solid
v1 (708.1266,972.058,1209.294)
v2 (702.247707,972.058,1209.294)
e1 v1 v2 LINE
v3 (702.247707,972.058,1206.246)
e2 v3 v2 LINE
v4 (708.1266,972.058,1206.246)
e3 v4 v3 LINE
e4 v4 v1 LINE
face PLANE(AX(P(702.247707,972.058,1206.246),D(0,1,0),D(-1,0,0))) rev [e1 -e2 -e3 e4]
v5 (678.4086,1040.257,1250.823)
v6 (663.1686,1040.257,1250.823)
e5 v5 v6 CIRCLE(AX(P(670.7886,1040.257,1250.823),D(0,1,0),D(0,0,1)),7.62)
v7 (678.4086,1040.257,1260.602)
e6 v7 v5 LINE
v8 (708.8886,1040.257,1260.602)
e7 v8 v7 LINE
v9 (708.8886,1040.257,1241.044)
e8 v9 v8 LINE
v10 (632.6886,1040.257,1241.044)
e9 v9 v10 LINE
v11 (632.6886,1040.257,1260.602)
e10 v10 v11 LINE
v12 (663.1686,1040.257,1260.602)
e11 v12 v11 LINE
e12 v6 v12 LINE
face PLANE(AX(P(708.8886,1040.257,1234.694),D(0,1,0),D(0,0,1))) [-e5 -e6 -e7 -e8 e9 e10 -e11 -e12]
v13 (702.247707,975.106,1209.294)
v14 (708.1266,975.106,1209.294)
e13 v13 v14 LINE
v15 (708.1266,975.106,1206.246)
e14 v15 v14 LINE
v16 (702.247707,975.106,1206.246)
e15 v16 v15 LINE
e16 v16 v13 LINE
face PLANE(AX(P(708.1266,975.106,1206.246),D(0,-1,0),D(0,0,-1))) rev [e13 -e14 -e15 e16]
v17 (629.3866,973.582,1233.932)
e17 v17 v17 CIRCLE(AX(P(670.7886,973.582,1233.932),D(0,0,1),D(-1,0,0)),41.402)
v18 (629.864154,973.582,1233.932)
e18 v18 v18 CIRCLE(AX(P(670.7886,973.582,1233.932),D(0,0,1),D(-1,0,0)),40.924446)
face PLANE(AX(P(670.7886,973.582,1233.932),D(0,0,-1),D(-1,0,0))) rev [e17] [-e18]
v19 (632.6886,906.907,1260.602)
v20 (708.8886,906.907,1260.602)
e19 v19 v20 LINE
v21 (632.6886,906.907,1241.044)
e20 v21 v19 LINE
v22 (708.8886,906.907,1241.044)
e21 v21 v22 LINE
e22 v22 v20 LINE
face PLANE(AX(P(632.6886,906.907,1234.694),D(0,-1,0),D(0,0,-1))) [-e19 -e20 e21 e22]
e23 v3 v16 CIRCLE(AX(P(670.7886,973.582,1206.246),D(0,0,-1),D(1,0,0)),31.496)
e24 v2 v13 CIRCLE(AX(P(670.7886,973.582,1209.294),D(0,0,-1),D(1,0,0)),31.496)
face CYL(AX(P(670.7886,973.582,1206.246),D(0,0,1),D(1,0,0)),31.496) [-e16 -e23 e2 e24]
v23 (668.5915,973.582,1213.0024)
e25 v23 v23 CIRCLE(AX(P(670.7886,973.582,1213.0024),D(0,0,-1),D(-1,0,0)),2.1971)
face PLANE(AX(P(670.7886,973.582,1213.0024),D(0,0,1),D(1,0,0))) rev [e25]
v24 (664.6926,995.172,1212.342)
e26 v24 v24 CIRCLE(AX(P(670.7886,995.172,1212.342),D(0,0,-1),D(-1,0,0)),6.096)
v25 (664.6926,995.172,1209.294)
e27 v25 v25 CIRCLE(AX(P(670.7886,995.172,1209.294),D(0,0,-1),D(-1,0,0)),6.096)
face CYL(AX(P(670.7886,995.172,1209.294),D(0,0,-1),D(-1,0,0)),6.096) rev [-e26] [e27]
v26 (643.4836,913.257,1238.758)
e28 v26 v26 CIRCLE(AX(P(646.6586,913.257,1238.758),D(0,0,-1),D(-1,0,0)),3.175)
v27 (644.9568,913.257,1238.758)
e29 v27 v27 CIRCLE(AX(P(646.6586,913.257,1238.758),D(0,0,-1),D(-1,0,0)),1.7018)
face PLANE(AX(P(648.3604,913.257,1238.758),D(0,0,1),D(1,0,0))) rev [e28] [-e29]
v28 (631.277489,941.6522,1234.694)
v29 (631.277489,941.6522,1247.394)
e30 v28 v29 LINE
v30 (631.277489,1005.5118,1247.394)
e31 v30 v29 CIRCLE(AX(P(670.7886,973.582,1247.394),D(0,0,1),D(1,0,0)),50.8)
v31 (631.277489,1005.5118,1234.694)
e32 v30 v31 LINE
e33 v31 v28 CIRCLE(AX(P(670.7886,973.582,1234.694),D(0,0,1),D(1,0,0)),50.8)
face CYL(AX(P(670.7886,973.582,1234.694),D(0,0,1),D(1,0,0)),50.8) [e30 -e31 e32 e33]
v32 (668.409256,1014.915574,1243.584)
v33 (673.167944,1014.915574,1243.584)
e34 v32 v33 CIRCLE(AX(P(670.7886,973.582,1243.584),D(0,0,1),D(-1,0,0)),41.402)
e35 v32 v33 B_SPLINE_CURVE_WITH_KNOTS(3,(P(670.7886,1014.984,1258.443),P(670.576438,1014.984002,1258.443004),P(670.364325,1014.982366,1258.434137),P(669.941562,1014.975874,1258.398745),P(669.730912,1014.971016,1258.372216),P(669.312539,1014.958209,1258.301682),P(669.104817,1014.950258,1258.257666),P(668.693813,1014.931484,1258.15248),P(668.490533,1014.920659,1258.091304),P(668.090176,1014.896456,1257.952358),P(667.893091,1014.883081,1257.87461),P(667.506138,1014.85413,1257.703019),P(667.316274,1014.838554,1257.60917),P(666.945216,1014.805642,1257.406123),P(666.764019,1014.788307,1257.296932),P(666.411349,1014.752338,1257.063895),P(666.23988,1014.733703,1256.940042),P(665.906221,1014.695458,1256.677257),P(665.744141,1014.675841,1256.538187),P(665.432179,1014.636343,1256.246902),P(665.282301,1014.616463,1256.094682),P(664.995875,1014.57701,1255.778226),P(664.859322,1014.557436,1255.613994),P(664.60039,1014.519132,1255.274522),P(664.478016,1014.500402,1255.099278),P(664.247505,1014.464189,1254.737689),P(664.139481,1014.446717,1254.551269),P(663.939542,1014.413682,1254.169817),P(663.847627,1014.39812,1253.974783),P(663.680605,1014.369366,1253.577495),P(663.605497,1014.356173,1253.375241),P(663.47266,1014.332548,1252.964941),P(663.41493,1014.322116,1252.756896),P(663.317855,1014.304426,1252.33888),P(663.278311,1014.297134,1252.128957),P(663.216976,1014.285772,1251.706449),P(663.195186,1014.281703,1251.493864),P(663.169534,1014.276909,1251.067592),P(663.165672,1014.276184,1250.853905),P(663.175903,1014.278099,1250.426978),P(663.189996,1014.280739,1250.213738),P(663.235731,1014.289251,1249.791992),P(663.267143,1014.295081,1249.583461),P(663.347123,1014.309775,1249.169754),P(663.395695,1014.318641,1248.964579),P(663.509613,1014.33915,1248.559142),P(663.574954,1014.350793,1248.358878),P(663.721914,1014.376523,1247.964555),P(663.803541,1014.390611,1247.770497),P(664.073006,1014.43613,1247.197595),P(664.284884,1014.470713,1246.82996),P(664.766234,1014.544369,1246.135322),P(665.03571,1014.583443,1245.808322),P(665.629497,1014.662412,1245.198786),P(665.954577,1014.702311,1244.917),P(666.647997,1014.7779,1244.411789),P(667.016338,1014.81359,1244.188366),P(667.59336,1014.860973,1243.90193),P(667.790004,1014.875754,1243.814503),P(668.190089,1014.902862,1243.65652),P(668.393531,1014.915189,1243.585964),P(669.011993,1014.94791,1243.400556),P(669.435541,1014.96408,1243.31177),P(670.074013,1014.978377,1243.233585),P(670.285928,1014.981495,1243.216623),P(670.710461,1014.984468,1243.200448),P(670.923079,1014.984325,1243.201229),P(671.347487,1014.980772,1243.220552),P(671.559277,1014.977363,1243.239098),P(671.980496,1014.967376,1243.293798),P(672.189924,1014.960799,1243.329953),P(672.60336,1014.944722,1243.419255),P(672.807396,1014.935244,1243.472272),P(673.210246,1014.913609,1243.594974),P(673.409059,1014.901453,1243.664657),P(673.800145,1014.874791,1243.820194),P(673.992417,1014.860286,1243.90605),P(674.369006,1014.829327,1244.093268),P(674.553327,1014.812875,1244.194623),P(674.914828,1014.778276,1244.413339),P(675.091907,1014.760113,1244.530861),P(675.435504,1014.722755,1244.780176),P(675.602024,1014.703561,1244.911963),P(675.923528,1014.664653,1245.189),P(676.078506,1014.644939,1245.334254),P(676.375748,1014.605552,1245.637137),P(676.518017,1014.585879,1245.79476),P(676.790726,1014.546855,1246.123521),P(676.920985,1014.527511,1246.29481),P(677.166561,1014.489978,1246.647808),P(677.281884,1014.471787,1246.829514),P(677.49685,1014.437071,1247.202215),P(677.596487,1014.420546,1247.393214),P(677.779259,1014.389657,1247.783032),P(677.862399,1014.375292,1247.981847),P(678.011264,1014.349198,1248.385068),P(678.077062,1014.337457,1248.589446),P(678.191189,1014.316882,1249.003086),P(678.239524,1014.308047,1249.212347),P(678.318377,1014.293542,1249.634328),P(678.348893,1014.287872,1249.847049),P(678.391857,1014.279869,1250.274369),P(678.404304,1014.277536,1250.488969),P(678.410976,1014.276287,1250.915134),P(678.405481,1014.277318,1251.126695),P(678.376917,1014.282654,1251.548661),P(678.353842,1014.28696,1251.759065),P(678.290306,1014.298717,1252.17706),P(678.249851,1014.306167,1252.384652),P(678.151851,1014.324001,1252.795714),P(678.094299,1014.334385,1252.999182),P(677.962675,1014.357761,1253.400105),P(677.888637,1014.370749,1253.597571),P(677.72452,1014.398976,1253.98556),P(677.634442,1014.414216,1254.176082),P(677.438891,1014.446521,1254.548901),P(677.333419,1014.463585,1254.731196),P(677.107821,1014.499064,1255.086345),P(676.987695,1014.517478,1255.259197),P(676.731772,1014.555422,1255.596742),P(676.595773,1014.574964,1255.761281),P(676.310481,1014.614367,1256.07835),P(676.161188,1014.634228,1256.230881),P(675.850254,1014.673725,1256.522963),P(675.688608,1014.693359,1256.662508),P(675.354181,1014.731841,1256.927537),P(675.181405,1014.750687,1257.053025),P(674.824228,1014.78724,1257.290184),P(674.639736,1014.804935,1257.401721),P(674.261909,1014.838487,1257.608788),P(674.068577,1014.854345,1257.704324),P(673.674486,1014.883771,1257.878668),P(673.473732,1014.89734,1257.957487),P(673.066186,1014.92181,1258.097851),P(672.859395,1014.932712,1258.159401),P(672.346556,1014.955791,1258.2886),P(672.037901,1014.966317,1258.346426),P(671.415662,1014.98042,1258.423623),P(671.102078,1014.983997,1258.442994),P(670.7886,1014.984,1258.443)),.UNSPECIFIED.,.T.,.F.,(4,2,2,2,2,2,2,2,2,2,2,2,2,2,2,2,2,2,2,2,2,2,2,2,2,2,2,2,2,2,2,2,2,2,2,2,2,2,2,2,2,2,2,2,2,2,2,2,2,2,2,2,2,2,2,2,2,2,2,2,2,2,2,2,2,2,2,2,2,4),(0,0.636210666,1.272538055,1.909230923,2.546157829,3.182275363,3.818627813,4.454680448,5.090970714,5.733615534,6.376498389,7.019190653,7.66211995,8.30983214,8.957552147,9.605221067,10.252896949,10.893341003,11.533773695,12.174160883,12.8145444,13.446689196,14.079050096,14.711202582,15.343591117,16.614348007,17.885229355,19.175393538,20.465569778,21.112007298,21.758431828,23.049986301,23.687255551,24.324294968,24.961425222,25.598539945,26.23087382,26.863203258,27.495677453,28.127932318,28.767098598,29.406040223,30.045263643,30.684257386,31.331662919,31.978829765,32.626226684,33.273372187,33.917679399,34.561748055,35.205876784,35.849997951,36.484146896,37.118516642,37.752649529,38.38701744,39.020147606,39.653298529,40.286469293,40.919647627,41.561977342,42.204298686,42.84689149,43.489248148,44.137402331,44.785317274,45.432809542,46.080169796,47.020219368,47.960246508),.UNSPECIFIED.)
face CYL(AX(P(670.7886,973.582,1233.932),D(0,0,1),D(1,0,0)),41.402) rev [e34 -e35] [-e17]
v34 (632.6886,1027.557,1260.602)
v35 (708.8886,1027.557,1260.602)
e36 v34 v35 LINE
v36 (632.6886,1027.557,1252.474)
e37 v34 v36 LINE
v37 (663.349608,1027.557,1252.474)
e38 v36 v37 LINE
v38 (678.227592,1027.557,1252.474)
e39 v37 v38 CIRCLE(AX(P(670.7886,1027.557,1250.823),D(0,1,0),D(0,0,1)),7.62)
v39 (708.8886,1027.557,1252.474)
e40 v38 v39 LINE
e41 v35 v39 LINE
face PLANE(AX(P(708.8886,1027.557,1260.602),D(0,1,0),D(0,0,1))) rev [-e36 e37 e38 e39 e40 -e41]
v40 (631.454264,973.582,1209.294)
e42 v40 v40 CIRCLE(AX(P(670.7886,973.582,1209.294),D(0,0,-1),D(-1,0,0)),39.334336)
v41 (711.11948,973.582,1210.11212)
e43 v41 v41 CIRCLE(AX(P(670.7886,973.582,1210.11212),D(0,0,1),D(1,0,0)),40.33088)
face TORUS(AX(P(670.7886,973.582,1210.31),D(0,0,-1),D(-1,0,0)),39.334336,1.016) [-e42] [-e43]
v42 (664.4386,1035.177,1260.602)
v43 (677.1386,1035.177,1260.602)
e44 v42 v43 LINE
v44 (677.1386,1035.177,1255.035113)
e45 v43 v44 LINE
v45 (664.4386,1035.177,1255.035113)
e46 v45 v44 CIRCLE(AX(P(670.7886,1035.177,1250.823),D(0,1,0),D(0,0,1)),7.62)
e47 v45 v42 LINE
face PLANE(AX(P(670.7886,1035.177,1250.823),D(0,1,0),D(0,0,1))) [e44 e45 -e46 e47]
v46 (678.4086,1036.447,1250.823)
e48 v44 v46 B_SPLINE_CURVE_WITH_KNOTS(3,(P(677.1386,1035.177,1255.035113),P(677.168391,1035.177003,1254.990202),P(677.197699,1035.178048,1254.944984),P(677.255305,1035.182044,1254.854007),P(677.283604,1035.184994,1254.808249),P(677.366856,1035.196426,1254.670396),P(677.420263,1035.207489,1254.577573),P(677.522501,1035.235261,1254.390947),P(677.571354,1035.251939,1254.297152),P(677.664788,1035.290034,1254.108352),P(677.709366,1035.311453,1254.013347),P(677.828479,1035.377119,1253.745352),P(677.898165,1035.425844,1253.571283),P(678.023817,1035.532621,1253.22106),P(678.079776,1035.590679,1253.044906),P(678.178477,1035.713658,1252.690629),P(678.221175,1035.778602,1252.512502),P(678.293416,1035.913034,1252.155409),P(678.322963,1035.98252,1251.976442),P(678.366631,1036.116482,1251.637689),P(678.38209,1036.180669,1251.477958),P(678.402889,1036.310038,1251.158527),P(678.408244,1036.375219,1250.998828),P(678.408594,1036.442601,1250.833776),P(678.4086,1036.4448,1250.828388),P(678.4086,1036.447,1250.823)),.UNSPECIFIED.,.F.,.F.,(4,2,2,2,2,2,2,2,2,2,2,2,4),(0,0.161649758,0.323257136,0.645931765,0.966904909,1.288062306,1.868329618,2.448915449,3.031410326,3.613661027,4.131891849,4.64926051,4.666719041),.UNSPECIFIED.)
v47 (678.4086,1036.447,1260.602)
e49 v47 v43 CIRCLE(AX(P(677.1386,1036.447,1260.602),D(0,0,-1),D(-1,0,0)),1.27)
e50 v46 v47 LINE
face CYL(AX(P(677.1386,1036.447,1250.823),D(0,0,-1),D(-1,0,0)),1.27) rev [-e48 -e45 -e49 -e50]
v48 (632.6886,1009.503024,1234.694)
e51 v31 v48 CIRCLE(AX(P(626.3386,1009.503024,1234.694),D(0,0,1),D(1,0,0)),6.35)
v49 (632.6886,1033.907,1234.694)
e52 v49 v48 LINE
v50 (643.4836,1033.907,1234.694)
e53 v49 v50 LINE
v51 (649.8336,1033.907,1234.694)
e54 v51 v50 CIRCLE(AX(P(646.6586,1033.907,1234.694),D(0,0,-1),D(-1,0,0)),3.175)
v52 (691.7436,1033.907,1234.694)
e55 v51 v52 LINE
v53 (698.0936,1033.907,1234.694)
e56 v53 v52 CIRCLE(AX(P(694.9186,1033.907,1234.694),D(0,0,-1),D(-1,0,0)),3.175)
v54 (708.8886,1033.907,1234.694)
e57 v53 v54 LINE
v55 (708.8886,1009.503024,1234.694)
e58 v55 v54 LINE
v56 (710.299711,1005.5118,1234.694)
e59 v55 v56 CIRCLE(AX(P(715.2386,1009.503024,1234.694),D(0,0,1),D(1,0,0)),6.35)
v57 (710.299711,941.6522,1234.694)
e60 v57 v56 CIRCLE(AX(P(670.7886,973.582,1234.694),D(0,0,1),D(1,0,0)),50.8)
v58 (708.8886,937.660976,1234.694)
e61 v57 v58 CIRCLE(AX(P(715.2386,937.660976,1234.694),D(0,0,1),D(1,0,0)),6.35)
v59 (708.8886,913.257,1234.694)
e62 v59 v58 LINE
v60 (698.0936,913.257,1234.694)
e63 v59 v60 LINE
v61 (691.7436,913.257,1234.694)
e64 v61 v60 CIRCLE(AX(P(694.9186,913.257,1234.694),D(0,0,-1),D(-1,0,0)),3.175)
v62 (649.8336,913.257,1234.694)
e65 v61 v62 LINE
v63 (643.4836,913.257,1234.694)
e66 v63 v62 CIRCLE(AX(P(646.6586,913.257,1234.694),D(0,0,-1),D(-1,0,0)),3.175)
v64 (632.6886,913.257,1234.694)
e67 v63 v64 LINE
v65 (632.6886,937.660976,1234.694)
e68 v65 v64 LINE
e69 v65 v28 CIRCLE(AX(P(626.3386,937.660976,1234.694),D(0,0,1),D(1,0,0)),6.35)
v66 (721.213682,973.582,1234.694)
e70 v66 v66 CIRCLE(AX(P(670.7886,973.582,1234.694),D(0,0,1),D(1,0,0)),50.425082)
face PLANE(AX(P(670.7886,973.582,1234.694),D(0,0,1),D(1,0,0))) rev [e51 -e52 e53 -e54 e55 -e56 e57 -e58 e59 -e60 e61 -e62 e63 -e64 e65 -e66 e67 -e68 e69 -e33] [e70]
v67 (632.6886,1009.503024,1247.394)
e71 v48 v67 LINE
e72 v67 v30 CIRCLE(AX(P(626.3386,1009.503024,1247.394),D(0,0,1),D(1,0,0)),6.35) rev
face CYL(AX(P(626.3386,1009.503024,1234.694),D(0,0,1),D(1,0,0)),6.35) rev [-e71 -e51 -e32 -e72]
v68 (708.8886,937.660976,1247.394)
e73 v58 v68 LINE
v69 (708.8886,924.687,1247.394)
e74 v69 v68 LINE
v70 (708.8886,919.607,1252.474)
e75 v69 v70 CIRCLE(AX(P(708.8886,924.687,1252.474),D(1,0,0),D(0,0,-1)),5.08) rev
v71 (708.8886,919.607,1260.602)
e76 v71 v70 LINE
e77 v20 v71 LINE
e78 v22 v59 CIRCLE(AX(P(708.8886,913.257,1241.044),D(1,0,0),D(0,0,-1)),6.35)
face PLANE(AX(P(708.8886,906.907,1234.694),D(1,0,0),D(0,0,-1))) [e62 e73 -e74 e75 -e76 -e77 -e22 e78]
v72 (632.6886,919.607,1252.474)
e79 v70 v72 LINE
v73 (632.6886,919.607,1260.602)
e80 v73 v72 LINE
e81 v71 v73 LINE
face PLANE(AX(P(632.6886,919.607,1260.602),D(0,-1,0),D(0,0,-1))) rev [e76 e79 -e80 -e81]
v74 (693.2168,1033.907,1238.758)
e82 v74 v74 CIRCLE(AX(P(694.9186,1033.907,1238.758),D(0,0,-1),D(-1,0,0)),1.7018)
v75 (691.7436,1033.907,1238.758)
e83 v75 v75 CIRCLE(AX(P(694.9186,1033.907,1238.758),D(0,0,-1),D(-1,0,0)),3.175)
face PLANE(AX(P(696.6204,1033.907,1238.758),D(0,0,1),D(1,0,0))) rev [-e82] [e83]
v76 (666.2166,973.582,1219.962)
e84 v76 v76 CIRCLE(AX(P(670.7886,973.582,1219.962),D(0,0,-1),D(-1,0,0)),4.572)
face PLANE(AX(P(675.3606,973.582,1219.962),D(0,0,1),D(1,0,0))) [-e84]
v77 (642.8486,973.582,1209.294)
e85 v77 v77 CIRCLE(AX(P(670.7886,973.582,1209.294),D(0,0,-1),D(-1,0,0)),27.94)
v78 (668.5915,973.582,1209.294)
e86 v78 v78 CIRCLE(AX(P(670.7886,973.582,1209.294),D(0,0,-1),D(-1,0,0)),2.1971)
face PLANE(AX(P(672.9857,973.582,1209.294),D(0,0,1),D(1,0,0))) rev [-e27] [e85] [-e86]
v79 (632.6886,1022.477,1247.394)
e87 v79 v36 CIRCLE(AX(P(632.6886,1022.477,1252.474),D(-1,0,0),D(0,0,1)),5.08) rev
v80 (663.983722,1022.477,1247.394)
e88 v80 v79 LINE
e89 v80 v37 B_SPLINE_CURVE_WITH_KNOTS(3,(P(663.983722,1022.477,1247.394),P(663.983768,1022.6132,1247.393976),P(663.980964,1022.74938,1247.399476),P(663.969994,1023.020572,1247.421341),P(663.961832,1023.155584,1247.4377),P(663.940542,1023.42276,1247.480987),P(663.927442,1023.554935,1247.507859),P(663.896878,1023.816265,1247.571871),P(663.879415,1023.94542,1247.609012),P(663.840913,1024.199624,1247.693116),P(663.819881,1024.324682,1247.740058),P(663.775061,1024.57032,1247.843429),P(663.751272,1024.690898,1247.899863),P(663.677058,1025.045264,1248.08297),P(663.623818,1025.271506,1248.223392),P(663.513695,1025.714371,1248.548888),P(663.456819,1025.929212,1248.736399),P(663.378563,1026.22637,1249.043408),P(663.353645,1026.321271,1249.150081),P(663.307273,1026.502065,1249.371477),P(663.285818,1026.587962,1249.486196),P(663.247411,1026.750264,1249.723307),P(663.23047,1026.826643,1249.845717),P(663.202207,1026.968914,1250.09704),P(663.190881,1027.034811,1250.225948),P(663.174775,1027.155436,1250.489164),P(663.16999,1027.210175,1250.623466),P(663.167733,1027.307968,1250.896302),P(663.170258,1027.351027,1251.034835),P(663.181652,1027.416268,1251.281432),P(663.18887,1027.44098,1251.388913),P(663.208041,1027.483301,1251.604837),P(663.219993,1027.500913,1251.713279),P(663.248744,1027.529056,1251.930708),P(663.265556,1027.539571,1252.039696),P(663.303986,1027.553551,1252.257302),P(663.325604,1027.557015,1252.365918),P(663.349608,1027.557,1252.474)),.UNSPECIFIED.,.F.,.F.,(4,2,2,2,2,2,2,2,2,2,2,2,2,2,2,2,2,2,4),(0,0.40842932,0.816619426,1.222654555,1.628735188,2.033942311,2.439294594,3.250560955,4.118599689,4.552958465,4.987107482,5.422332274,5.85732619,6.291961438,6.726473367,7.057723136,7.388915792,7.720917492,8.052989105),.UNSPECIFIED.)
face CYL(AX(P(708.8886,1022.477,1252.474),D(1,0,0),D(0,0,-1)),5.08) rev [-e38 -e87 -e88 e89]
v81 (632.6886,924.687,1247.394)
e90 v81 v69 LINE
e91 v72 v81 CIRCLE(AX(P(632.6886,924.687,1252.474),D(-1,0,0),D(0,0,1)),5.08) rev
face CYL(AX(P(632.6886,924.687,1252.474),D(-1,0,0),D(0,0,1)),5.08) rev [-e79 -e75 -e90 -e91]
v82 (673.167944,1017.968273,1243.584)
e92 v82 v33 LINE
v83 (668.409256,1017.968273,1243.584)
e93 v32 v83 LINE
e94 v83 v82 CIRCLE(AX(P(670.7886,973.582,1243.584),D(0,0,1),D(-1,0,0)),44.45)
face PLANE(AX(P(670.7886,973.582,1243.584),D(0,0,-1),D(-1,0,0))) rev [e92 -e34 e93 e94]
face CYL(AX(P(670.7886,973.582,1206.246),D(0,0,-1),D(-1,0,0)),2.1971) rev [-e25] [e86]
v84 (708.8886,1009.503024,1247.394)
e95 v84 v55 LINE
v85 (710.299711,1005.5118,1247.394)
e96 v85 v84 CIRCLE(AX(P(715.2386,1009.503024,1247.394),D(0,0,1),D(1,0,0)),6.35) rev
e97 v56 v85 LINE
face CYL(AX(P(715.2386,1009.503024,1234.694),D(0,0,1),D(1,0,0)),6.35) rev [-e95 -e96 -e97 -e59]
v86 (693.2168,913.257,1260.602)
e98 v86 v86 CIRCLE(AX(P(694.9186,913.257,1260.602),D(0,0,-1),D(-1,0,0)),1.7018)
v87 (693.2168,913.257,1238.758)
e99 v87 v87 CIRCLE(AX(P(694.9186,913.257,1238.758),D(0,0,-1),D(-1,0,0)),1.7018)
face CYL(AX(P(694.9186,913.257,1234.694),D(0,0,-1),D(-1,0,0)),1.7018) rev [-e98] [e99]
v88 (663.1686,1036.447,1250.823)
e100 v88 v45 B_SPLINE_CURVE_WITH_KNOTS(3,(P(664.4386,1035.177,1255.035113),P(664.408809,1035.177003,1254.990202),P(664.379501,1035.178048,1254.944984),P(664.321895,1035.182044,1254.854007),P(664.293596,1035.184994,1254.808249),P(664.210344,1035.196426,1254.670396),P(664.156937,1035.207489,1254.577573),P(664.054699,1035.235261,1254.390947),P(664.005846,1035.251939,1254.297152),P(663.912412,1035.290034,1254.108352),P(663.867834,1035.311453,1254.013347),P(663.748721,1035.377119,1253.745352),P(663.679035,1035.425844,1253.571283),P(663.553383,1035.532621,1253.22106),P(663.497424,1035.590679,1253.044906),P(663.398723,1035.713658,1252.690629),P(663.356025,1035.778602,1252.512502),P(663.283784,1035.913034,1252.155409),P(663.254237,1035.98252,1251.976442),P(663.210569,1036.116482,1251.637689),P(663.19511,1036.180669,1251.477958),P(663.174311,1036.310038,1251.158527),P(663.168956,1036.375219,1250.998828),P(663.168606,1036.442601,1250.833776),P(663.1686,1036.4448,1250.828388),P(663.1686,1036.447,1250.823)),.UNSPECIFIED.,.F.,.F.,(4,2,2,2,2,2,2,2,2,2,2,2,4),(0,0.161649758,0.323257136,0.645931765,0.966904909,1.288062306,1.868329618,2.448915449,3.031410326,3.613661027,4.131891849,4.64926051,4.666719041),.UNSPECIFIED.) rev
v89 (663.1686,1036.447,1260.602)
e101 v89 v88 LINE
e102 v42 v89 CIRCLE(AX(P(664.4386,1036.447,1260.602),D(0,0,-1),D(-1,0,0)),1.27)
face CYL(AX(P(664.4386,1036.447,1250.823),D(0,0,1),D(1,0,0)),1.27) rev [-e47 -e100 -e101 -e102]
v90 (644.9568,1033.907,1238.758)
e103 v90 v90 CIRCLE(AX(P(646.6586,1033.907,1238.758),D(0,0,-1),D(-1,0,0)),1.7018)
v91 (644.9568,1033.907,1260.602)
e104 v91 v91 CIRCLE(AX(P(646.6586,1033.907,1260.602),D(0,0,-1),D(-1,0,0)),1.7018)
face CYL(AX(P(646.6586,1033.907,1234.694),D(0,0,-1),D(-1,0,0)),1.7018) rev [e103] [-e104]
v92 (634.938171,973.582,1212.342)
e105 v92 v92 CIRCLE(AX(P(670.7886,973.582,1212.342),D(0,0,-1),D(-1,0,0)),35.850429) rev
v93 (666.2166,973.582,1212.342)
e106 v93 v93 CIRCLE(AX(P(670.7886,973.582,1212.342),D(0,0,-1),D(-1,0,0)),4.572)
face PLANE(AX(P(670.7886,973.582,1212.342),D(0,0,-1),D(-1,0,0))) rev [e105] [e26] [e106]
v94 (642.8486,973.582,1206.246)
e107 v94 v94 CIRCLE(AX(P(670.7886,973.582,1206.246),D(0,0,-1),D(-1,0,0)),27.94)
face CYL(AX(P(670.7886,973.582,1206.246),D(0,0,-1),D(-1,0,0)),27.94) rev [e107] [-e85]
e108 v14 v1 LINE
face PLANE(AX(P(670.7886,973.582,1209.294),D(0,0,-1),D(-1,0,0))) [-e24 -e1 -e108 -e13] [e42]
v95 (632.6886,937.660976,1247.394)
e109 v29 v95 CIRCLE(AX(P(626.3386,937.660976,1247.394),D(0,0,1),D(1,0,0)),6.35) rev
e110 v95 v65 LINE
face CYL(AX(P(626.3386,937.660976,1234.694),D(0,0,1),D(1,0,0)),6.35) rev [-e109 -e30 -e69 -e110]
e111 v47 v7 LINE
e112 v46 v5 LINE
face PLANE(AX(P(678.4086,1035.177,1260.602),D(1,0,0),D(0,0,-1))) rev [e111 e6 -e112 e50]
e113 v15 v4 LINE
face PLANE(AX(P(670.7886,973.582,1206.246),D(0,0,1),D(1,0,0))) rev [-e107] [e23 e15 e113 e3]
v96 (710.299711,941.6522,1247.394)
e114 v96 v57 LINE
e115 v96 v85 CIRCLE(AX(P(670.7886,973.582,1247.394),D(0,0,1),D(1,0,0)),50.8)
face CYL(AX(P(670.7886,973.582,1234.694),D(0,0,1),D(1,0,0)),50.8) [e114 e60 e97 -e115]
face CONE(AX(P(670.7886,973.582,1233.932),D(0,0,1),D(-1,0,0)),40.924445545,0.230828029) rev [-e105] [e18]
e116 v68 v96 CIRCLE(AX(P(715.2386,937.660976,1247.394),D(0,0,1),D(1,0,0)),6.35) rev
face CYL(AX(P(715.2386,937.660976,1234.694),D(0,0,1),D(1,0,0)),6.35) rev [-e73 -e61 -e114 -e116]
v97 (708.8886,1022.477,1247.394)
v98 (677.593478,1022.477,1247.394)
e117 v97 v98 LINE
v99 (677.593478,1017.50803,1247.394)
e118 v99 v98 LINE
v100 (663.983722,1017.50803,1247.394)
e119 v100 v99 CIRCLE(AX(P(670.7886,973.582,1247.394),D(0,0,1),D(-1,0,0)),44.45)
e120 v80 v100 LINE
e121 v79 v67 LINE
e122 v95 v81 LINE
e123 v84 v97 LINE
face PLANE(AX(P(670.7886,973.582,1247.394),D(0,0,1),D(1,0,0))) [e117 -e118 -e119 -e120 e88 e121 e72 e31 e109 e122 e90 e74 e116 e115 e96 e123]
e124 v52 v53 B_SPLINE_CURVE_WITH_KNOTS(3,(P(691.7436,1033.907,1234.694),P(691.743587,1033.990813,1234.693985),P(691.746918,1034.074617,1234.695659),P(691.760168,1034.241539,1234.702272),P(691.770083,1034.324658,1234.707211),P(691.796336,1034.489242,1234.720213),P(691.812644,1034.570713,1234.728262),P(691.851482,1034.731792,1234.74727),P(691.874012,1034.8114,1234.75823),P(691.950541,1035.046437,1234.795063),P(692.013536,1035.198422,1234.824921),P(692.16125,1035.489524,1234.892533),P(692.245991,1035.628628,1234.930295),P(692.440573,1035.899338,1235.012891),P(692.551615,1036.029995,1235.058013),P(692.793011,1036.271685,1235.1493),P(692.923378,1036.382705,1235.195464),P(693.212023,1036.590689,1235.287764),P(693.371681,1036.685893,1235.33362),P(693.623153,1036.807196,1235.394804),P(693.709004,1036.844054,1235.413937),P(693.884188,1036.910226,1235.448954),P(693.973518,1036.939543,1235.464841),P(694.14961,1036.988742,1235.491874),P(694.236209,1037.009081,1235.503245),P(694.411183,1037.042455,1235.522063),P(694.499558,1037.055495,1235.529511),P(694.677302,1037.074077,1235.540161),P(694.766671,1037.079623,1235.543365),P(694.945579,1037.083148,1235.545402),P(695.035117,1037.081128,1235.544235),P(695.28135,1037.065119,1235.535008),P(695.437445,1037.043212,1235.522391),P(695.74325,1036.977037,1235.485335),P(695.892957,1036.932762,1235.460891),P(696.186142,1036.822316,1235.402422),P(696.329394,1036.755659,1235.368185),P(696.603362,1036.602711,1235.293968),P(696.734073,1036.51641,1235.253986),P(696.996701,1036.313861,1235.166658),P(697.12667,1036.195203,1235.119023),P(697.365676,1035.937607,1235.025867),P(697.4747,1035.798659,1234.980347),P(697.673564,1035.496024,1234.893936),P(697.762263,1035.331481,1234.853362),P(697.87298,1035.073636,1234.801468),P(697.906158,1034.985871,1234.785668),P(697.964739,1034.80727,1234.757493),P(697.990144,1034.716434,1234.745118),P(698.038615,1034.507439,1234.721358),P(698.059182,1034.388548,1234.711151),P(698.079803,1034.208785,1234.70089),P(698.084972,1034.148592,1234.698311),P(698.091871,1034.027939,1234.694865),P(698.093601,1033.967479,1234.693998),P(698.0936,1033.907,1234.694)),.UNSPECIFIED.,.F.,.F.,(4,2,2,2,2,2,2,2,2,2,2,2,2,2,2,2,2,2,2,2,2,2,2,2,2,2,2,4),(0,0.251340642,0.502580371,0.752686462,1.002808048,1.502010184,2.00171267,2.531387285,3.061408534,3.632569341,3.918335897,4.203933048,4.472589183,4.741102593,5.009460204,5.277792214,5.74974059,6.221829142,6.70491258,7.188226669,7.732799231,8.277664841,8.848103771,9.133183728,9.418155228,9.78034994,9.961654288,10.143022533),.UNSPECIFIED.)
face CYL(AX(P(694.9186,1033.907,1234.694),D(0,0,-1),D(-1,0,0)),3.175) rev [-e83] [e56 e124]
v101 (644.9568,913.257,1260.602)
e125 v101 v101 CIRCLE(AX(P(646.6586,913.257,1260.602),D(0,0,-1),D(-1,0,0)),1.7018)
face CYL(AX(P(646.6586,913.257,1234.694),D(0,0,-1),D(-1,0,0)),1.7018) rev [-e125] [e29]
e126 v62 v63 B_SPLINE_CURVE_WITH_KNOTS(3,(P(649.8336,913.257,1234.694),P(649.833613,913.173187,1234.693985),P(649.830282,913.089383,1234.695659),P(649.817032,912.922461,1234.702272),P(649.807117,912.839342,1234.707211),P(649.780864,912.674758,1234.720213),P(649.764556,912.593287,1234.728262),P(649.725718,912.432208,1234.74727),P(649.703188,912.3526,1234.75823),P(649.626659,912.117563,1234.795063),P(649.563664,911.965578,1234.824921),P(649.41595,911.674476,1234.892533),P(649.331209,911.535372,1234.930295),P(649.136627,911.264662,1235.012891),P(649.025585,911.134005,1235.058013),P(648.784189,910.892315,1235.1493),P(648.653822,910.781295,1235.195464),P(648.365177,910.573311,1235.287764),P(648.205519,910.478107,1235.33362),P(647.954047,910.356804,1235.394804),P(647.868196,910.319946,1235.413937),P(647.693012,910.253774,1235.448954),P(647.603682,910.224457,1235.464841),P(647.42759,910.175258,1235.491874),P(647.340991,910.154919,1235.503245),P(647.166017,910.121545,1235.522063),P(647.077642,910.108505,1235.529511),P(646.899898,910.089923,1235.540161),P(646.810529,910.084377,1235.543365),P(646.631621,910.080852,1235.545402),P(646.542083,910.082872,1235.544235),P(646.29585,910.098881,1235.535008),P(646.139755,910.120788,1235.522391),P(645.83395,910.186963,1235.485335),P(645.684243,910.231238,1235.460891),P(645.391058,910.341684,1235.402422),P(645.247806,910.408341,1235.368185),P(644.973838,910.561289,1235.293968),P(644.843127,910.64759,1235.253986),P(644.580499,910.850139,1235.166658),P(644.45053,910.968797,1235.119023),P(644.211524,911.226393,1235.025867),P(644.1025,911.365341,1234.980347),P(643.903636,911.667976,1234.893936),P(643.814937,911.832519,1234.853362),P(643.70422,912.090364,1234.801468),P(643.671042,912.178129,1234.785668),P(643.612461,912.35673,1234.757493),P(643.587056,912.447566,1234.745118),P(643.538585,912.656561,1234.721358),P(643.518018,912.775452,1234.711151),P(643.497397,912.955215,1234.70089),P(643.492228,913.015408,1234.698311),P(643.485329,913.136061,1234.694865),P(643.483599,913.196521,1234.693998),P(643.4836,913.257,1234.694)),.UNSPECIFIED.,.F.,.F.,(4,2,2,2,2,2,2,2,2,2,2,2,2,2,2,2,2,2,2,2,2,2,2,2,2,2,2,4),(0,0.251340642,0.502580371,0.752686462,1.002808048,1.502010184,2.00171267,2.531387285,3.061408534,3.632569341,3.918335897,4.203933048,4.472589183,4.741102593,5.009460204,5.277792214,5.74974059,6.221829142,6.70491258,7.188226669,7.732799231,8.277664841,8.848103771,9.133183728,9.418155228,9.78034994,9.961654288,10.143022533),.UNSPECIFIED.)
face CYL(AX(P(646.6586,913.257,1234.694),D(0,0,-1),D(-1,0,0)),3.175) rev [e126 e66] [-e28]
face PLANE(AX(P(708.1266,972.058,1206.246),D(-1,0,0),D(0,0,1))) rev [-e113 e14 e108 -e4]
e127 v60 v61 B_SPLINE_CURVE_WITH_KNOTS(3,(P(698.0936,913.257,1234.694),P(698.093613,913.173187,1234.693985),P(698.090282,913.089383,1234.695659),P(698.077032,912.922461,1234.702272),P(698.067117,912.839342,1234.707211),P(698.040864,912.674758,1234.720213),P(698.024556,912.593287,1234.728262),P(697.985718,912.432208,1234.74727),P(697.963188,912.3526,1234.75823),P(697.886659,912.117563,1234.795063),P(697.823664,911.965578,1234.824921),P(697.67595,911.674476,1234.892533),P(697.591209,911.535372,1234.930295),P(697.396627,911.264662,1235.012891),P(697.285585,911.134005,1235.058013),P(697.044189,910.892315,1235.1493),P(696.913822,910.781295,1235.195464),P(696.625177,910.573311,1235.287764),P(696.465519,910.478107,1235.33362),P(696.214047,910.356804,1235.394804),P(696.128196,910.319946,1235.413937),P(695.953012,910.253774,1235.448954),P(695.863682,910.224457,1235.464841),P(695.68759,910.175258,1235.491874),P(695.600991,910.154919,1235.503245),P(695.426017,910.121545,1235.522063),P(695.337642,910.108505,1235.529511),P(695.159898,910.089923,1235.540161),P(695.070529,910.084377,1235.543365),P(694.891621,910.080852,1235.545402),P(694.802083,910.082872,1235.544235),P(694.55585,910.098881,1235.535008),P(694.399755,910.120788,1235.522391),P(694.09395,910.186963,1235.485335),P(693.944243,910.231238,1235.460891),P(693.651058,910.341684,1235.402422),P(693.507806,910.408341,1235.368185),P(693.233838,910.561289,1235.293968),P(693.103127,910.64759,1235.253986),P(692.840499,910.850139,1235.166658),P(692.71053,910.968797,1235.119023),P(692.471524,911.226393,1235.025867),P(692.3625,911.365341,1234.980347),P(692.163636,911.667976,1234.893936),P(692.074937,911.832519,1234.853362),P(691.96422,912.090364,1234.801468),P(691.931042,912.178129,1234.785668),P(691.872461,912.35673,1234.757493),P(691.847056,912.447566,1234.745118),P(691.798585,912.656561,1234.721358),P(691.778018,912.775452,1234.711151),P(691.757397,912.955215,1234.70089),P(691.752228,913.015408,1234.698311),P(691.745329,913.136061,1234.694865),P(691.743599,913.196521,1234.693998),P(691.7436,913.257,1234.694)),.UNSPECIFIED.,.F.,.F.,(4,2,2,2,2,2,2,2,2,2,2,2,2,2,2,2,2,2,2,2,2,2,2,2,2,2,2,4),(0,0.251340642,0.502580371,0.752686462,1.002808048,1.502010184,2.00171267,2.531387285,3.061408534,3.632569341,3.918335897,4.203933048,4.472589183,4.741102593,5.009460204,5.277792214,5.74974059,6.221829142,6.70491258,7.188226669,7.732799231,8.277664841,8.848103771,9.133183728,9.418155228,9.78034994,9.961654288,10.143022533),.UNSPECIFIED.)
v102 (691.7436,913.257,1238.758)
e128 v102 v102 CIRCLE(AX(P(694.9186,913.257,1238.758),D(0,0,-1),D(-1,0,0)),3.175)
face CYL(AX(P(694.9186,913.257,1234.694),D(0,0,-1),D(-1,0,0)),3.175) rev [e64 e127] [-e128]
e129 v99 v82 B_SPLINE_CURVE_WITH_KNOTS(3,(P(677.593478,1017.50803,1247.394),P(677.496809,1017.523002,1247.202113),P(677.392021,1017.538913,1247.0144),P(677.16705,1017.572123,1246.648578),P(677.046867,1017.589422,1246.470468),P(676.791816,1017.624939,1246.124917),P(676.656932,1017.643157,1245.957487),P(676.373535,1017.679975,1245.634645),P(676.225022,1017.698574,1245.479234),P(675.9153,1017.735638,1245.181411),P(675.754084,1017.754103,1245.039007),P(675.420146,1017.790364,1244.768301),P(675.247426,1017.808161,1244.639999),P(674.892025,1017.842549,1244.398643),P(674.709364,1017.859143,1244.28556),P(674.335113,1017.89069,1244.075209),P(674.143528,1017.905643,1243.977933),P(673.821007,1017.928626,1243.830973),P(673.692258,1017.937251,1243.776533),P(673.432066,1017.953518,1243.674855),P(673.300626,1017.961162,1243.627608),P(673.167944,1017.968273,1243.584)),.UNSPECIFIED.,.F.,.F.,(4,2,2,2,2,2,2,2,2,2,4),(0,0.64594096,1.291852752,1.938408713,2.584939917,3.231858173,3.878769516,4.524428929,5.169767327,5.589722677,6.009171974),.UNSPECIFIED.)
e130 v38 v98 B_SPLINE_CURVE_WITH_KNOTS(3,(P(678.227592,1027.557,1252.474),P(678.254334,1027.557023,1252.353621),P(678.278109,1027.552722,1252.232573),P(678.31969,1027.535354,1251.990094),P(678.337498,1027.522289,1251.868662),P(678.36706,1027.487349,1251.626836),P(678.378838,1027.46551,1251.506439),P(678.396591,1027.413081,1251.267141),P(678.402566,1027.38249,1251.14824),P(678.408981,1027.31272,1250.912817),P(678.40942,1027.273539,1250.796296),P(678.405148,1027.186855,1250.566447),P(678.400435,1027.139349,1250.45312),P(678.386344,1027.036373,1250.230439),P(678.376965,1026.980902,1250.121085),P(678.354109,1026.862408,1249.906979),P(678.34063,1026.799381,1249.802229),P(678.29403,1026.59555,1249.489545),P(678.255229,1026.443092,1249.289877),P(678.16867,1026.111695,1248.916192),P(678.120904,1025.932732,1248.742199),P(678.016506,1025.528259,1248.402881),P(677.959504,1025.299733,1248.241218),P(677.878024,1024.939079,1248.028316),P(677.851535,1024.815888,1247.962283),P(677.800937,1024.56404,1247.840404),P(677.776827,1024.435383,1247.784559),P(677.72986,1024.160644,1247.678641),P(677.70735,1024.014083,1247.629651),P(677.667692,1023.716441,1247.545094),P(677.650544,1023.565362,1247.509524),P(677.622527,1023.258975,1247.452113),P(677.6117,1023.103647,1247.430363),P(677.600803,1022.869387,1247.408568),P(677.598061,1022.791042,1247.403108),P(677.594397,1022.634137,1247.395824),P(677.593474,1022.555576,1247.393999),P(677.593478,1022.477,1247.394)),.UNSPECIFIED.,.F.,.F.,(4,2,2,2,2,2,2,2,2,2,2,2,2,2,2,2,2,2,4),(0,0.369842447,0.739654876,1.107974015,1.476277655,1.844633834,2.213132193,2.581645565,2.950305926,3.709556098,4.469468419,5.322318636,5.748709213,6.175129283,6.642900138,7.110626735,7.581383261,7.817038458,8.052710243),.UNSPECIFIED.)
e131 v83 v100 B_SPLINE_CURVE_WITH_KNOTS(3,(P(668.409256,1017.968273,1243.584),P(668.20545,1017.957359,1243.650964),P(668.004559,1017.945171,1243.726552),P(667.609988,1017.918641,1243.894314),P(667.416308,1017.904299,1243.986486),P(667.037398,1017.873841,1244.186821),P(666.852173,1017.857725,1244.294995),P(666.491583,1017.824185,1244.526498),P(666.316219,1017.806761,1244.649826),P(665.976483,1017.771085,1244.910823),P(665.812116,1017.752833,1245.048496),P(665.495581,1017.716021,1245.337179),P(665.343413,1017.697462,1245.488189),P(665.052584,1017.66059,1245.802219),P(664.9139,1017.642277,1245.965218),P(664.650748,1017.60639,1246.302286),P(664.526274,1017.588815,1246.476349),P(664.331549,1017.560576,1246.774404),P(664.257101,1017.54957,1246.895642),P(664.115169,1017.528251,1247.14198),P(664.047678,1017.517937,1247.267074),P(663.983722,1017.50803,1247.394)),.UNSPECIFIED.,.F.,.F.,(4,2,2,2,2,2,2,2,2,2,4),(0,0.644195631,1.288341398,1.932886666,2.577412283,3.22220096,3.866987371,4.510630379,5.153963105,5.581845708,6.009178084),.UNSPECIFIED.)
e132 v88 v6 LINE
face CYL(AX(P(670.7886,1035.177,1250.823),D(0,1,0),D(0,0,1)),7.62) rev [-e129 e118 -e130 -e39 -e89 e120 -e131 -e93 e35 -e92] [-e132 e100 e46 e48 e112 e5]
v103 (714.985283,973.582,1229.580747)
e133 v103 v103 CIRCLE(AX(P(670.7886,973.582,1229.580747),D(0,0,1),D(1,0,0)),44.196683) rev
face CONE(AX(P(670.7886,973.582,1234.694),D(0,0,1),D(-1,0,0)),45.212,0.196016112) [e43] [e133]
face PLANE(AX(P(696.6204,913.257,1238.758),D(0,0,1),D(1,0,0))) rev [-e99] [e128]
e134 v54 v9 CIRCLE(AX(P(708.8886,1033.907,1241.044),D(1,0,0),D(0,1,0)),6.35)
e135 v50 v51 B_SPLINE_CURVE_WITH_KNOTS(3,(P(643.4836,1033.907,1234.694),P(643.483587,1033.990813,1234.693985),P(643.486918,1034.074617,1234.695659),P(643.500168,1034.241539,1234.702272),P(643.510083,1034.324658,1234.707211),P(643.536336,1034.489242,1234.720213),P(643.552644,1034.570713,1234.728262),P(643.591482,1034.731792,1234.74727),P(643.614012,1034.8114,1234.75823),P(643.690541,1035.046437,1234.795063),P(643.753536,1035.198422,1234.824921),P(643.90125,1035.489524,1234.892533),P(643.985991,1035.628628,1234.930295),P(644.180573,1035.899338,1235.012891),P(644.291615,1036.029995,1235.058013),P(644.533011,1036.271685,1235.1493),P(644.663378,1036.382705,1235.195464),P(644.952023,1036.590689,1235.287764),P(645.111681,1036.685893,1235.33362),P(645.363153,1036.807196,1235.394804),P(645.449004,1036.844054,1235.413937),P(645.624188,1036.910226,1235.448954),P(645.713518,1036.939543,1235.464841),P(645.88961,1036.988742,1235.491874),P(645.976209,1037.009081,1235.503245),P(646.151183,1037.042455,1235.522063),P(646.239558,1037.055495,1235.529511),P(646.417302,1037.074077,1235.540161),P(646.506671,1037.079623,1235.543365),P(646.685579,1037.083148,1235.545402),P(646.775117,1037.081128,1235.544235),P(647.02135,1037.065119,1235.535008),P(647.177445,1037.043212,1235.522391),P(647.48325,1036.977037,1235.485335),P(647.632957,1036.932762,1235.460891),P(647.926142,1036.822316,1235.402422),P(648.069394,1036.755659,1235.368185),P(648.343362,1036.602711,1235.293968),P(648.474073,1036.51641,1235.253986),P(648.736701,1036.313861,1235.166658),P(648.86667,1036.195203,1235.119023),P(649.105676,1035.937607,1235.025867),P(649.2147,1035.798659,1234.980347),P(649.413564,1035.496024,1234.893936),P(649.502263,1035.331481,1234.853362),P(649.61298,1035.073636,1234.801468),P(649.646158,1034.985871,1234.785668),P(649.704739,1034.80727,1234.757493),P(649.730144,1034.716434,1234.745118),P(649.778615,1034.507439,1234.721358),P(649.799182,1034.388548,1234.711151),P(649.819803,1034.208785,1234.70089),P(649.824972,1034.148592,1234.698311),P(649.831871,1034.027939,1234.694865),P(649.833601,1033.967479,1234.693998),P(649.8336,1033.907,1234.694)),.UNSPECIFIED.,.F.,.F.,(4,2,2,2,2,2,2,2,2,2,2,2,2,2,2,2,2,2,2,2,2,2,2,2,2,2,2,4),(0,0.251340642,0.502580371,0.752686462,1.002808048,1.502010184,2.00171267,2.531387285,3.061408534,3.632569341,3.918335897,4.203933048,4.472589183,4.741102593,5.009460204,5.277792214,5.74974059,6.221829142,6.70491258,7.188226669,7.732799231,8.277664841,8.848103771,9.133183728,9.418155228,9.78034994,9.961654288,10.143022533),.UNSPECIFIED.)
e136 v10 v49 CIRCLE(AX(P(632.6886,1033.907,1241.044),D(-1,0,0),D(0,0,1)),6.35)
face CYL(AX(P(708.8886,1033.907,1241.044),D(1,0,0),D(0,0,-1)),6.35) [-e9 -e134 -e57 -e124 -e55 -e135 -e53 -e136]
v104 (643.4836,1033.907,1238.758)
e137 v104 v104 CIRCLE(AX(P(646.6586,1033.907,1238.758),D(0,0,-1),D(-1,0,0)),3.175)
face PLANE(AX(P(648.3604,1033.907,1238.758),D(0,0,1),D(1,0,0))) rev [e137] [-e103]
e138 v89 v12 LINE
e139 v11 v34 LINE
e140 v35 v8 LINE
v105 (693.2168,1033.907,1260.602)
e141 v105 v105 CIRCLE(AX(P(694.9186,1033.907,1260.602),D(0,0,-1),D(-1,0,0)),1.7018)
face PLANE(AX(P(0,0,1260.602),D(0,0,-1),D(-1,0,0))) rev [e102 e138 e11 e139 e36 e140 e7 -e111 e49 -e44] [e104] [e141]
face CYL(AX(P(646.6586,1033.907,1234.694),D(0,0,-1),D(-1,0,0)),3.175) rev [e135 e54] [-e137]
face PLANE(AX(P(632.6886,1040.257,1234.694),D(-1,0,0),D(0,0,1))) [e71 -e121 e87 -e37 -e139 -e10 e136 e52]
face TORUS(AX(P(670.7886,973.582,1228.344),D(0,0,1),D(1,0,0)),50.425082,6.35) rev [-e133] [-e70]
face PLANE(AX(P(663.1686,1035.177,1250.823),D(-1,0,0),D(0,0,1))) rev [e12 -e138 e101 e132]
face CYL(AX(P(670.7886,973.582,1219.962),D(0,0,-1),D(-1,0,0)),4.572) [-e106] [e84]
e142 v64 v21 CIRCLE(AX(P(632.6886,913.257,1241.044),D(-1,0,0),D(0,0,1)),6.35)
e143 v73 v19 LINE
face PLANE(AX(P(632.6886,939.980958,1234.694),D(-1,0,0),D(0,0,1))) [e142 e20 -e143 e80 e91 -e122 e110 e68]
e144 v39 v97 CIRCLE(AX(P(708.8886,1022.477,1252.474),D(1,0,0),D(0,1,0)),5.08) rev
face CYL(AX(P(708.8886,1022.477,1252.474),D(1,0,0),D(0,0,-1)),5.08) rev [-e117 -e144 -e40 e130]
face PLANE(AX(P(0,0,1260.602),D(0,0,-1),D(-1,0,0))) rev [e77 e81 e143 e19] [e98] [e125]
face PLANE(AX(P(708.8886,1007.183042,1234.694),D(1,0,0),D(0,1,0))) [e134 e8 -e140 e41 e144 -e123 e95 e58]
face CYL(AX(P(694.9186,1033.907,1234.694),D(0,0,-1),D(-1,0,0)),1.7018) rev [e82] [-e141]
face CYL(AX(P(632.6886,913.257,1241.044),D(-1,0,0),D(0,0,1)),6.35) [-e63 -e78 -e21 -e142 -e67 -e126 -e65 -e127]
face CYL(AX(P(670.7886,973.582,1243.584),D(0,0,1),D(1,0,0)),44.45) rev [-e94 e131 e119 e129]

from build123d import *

# Parameters (mm, degrees)
BOSS_EXTRUDE1_DEPTH                                = 12.7
SKETCH2_W                                          = 76.2
SKETCH2_H                                          = 12.7
BOSS_EXTRUDE2_DEPTH                                = 13.208
SKETCH3_W                                          = 76.2
SKETCH3_H                                          = 12.7
BOSS_EXTRUDE3_DEPTH                                = 13.208
SKETCH4_R                                          = 45.212
BOSS_EXTRUDE4_DEPTH                                = 25.4
BOSS_EXTRUDE4_TAPER                                = 11.230895956
BOSS_EXTRUDE5_DEPTH                                = 3.048
SKETCH6_R                                          = 44.45
CUT_EXTRUDE1_DEPTH                                 = 3.81
SKETCH7_R                                          = 41.402
CUT_EXTRUDE2_DEPTH                                 = 9.652
SKETCH8_R                                          = 40.924445545
CUT_EXTRUDE3_DEPTH                                 = 21.59
CUT_EXTRUDE3_DRAFT                                 = -13.225471871
SKETCH9_W                                          = 4.572
SKETCH9_H                                          = 7.62
CBORE_FOR_M3_HEX_HEAD_MACHINE_SCREW1_D             = 3.4036
CBORE_FOR_M3_HEX_HEAD_MACHINE_SCREW1_CBORE_D       = 6.35
CBORE_FOR_M3_HEX_HEAD_MACHINE_SCREW1_CBORE_DEPTH   = 4.064
CBORE_FOR_M3_5_HEX_HEAD_MACHINE_SCREW1_D           = 4.3942
CBORE_FOR_M3_5_HEX_HEAD_MACHINE_SCREW1_DEPTH       = 6.7564
CBORE_FOR_M3_5_HEX_HEAD_MACHINE_SCREW1_CBORE_D     = 55.88
CBORE_FOR_M3_5_HEX_HEAD_MACHINE_SCREW1_CBORE_DEPTH = 3.048
HOLE2_D                                            = 12.192
HOLE2_DEPTH                                        = 51.308
FILLET1_R                                          = 1.016
FILLET2_R                                          = 5.08
FILLET3_R                                          = 6.35
CUT_EXTRUDE4_DEPTH                                 = 5.08
CUT_EXTRUDE5_REACH                                 = 1460.17
SKETCH20_R                                         = 7.62
FILLET4_R                                          = 1.27


with BuildPart() as part:
    # Sketch1 → Boss-Extrude1 (new body)
    with BuildSketch(Plane.XY.offset(1247.394)):
        with BuildLine():
            Line((632.6886, 939.980958349), (632.6886, 906.907))
            Line((632.6886, 906.907), (708.8886, 906.907))
            Line((708.8886, 906.907), (708.8886, 939.980958349))
            ThreePointArc((708.8886, 939.980958349), (721.5886, 973.582), (708.8886, 1007.183041651))
            Line((708.8886, 1007.183041651), (708.8886, 1040.257))
            Line((708.8886, 1040.257), (632.6886, 1040.257))
            Line((632.6886, 1040.257), (632.6886, 1007.183041651))
            ThreePointArc((632.6886, 1007.183041651), (619.9886, 973.582), (632.6886, 939.980958349))
        make_face()
    extrude(amount=-BOSS_EXTRUDE1_DEPTH)

    # Sketch2 → Boss-Extrude2 (add)
    with BuildSketch(Plane.XY.offset(1247.394)):
        with Locations((670.7886, 1033.907)):
            Rectangle(SKETCH2_W, SKETCH2_H)
    extrude(amount=BOSS_EXTRUDE2_DEPTH)

    # Sketch3 → Boss-Extrude3 (add)
    with BuildSketch(Plane.XY.offset(1247.394)):
        with Locations((670.7886, 913.257)):
            Rectangle(SKETCH3_W, SKETCH3_H)
    extrude(amount=BOSS_EXTRUDE3_DEPTH)

    # Sketch4 → Boss-Extrude4 (add)
    with BuildSketch(Plane(origin=(0, 0, 1234.694), x_dir=(-1, 0, 0), z_dir=(0, 0, -1))):
        with Locations((-670.7886, 973.582)):
            Circle(SKETCH4_R)
    extrude(amount=BOSS_EXTRUDE4_DEPTH, taper=BOSS_EXTRUDE4_TAPER)

    # Sketch5 → Boss-Extrude5 (add)
    with BuildSketch(Plane(origin=(0, 0, 1209.294), x_dir=(-1, 0, 0), z_dir=(0, 0, -1))):
        with BuildLine():
            Line((-708.1266, 972.058), (-708.1266, 975.106))
            Line((-708.1266, 975.106), (-702.247707425, 975.106))
            ThreePointArc((-702.247707425, 975.106), (-639.2926, 973.582), (-702.247707425, 972.058))
            Line((-702.247707425, 972.058), (-708.1266, 972.058))
        make_face()
    extrude(amount=BOSS_EXTRUDE5_DEPTH)

    # Sketch6 → Cut-Extrude1 (cut)
    with BuildSketch(Plane.XY.offset(1247.394)):
        with Locations(Location((670.7886, 973.582, 0), (0, 0, 180))):
            Circle(SKETCH6_R)
    extrude(amount=-CUT_EXTRUDE1_DEPTH, mode=Mode.SUBTRACT)

    # Sketch7 → Cut-Extrude2 (cut)
    with BuildSketch(Plane.XY.offset(1243.584)):
        with Locations(Location((670.7886, 973.582, 0), (0, 0, 180))):
            Circle(SKETCH7_R)
    extrude(amount=-CUT_EXTRUDE2_DEPTH, mode=Mode.SUBTRACT)


with BuildPart() as cut_extrude3_tool:
    # Sketch8 → Cut-Extrude3 (with draft: the straight prism first)
    with BuildSketch(Plane.XY.offset(1233.932)):
        with Locations((670.7886, 973.582)):
            Circle(SKETCH8_R)
    extrude(amount=-CUT_EXTRUDE3_DEPTH)
    # Cut-Extrude3: the draft: its side faces are tilted about the plane it starts from
    cut_extrude3_sides = [cut_extrude3_tool.faces().sort_by_distance(p)[0] for p in [
        (629.864154455, 973.582, 1223.137),
    ]]
    draft(cut_extrude3_sides, Plane.XY.offset(1233.932), CUT_EXTRUDE3_DRAFT)


with BuildPart() as part_1:
    add(part.part)

    # Cut-Extrude3: cut by cut_extrude3_tool
    add(cut_extrude3_tool.part, mode=Mode.SUBTRACT)

    # Sketch9 → Revolve1 (revolve)
    with BuildSketch(Plane.XZ.offset(-973.582), mode=Mode.PRIVATE) as revolve1_sk:
        with Locations((673.0746, 1216.152)):
            Rectangle(SKETCH9_W, SKETCH9_H)
    revolve(revolve1_sk.sketch.rotate(Axis((670.7886, 973.582, 1219.962), (0, 0, -1)), 180), axis=Axis((670.7886, 973.582, 1219.962), (0, 0, -1)))

    # CBORE for M3 Hex Head Machine Screw1 (through all)
    with Locations(Plane(origin=(0, 0, 1234.694), x_dir=(-1, 0, 0), z_dir=(0, 0, -1))):
        with Locations((-694.9186, 1033.907), (-646.6586, 1033.907), (-694.9186, 913.257), (-646.6586, 913.257)):
            CounterBoreHole(CBORE_FOR_M3_HEX_HEAD_MACHINE_SCREW1_D / 2, CBORE_FOR_M3_HEX_HEAD_MACHINE_SCREW1_CBORE_D / 2, CBORE_FOR_M3_HEX_HEAD_MACHINE_SCREW1_CBORE_DEPTH)

    # CBORE for M3.5 Hex Head Machine Screw1
    with Locations(Plane(origin=(0, 0, 1206.246), x_dir=(-1, 0, 0), z_dir=(0, 0, -1))):
        with Locations((-670.7886, 973.582)):
            CounterBoreHole(CBORE_FOR_M3_5_HEX_HEAD_MACHINE_SCREW1_D / 2, CBORE_FOR_M3_5_HEX_HEAD_MACHINE_SCREW1_CBORE_D / 2, CBORE_FOR_M3_5_HEX_HEAD_MACHINE_SCREW1_CBORE_DEPTH, depth=CBORE_FOR_M3_5_HEX_HEAD_MACHINE_SCREW1_DEPTH)

    # Hole2
    with Locations(Plane(origin=(0, 0, 1209.294), x_dir=(-1, 0, 0), z_dir=(0, 0, -1))):
        with Locations((-670.7886, 995.172)):
            Hole(HOLE2_D / 2, depth=HOLE2_DEPTH)

    # Fillet1
    fillet1_edges = [part_1.edges().sort_by_distance(p)[0] for p in [
        (710.957029457, 973.582, 1209.294),
    ]]
    fillet(fillet1_edges, radius=FILLET1_R)

    # Fillet2
    fillet2_edges = [part_1.edges().sort_by_distance(p)[0] for p in [
        (670.7886, 1027.557, 1247.394),
        (670.7886, 919.607, 1247.394),
    ]]
    fillet(fillet2_edges, radius=FILLET2_R)

    # Fillet3
    # the kernel refuses this fillet: 6.35 mm, written as the material it adds along each edge
    with BuildSketch(Plane(origin=(632.6886, 1007.183041651, 1247.394), x_dir=(-0.645138115564499, -0.7640659734904358, 0), z_dir=(0, 0, -1))) as fillet3_piece_1:
        with BuildLine():
            CenterArc((2.324007091, 6.348528285), FILLET3_R, 229.823968311, 38.942441269)
            Line((-1.772619942, 1.496709354), (0, 0))
            ThreePointArc((0, 0), (1.093650396, 0.011773719), (2.187300792, 0))
        make_face()
    extrude(amount=12.7)
    with BuildSketch(Plane(origin=(708.8886, 1007.183041651, 1247.394), x_dir=(0, 1, 0), z_dir=(0, 0, -1)), Plane(origin=(632.6886, 939.980958349, 1247.394), x_dir=(0, -1, 0), z_dir=(0, 0, -1))) as fillet3_piece_2:
        with BuildLine():
            CenterArc((2.319982834, 6.35), FILLET3_R, 231.057558731, 38.942441269)
            ThreePointArc((-1.671242109, 1.411111111), (-0.82802538, 0.714551453), (0, 0))
            Line((0, 0), (2.319982834, 0))
        make_face()
    extrude(amount=12.7)
    with BuildSketch(Plane(origin=(708.8886, 939.980958349, 1247.394), x_dir=(0, -1, 0), z_dir=(0, 0, -1))) as fillet3_piece_3:
        with BuildLine():
            CenterArc((2.319982834, -6.35), FILLET3_R, 90, 38.942441269)
            ThreePointArc((-1.671242109, -1.411111111), (-0.82802538, -0.714551453), (0, 0))
            Line((0, 0), (2.319982834, 0))
        make_face()
    extrude(amount=12.7)
    with BuildSketch(Plane(origin=(670.7886, 973.582, 1234.694), x_dir=(-1, 0, 0), z_dir=(0, -1, 0))) as fillet3_piece_4:
        with BuildLine():
            CenterArc((45.212 + FILLET3_R * 0.820957827564, FILLET3_R), FILLET3_R, 191.230895956, 78.769104044)
            Line((45.212 - FILLET3_R * 0.159892446987, FILLET3_R * 0.805236710561), (45.212, 0))
            Line((45.212, 0), (45.212 + FILLET3_R * 0.820957827564, 0))
        make_face()
    revolve(axis=Axis((670.7886, 973.582, 1234.694), (0, 0, -1)))
    # the kernel refuses this fillet: 6.35 mm, written as the material it takes off along each edge
    with BuildSketch(Plane(origin=(616.8136, 906.907, 1234.694), x_dir=(0, 0, 1), z_dir=(1, 0, 0))) as fillet3_2_piece_1:
        with BuildLine():
            CenterArc((FILLET3_R, -FILLET3_R), FILLET3_R, 90, 90)
            Line((0, -FILLET3_R), (0, 0))
            Line((0, 0), (FILLET3_R, 0))
        make_face()
    extrude(amount=107.95, mode=Mode.SUBTRACT)
    with BuildSketch(Plane(origin=(724.7636, 1040.257, 1234.694), x_dir=(0, -1, 0), z_dir=(-1, 0, 0))) as fillet3_2_piece_2:
        with BuildLine():
            CenterArc((FILLET3_R, FILLET3_R), FILLET3_R, 180, 90)
            Line((0, FILLET3_R), (0, 0))
            Line((0, 0), (FILLET3_R, 0))
        make_face()
    extrude(amount=107.95, mode=Mode.SUBTRACT)

    # Sketch18 → Cut-Extrude4 (cut)
    with BuildSketch(Plane(origin=(0, 1040.257, 0), x_dir=(1, 0, 0), z_dir=(0, 1, 0))):
        with BuildLine():
            Line((663.1686, -1250.823), (663.1686, -1260.602))
            Line((663.1686, -1260.602), (678.4086, -1260.602))
            Line((678.4086, -1260.602), (678.4086, -1250.823))
            ThreePointArc((678.4086, -1250.823), (670.7886, -1243.203), (663.1686, -1250.823))
        make_face()
    extrude(amount=-CUT_EXTRUDE4_DEPTH, mode=Mode.SUBTRACT)

    # Sketch20 → Cut-Extrude5 (cut, up to next)
    with BuildSketch(Plane(origin=(0, 1035.177, 0), x_dir=(1, 0, 0), z_dir=(0, 1, 0)), mode=Mode.PRIVATE) as cut_extrude5_sk1:
        with Locations(Location((670.7886, -1250.823, 0), (0, 0, 192.513325363))):
            Circle(SKETCH20_R)
    cut_extrude5_tool1 = extrude(cut_extrude5_sk1.sketch, amount=-CUT_EXTRUDE5_REACH, mode=Mode.PRIVATE) & part_1.part
    add(cut_extrude5_tool1.solids().sort_by_distance((670.7886, 1035.177, 1250.823))[0], mode=Mode.SUBTRACT)

    # Fillet4
    # the kernel refuses this fillet: 1.27 mm, written as the material it adds along each edge
    with BuildSketch(Plane(origin=(678.4086, 1035.177, 1260.602), x_dir=(0, 1, 0), z_dir=(0, 0, -1))) as fillet4_piece_1_section:
        with BuildLine():
            CenterArc((FILLET4_R, -FILLET4_R), FILLET4_R, 90, 90)
            Line((0, -FILLET4_R), (0, 0))
            Line((0, 0), (FILLET4_R, 0))
        make_face()
    fillet4_piece_1 = extrude(amount=12.954, mode=Mode.PRIVATE)
    fillet4_piece_1 = fillet4_piece_1 - Plane(origin=(670.7886, 1035.477046346, 1250.823), x_dir=(-0.9762456430400507, 0, 0.21666666666868278), z_dir=(0, 1, 0)) * Cylinder(7.62, 31, mode=Mode.PRIVATE)
    add(fillet4_piece_1)
    with BuildSketch(Plane(origin=(663.1686, 1035.177, 1247.648), x_dir=(0, 1, 0), z_dir=(0, 0, 1))) as fillet4_piece_2_section:
        with BuildLine():
            CenterArc((FILLET4_R, -FILLET4_R), FILLET4_R, 90, 90)
            Line((0, -FILLET4_R), (0, 0))
            Line((0, 0), (FILLET4_R, 0))
        make_face()
    fillet4_piece_2 = extrude(amount=12.954, mode=Mode.PRIVATE)
    fillet4_piece_2 = fillet4_piece_2 - Plane(origin=(670.7886, 1035.477042519, 1250.823), x_dir=(-0.9762456430400507, 0, 0.21666666666868278), z_dir=(0, 1, 0)) * Cylinder(7.62, 31, mode=Mode.PRIVATE)
    add(fillet4_piece_2)


solid = part_1.part
